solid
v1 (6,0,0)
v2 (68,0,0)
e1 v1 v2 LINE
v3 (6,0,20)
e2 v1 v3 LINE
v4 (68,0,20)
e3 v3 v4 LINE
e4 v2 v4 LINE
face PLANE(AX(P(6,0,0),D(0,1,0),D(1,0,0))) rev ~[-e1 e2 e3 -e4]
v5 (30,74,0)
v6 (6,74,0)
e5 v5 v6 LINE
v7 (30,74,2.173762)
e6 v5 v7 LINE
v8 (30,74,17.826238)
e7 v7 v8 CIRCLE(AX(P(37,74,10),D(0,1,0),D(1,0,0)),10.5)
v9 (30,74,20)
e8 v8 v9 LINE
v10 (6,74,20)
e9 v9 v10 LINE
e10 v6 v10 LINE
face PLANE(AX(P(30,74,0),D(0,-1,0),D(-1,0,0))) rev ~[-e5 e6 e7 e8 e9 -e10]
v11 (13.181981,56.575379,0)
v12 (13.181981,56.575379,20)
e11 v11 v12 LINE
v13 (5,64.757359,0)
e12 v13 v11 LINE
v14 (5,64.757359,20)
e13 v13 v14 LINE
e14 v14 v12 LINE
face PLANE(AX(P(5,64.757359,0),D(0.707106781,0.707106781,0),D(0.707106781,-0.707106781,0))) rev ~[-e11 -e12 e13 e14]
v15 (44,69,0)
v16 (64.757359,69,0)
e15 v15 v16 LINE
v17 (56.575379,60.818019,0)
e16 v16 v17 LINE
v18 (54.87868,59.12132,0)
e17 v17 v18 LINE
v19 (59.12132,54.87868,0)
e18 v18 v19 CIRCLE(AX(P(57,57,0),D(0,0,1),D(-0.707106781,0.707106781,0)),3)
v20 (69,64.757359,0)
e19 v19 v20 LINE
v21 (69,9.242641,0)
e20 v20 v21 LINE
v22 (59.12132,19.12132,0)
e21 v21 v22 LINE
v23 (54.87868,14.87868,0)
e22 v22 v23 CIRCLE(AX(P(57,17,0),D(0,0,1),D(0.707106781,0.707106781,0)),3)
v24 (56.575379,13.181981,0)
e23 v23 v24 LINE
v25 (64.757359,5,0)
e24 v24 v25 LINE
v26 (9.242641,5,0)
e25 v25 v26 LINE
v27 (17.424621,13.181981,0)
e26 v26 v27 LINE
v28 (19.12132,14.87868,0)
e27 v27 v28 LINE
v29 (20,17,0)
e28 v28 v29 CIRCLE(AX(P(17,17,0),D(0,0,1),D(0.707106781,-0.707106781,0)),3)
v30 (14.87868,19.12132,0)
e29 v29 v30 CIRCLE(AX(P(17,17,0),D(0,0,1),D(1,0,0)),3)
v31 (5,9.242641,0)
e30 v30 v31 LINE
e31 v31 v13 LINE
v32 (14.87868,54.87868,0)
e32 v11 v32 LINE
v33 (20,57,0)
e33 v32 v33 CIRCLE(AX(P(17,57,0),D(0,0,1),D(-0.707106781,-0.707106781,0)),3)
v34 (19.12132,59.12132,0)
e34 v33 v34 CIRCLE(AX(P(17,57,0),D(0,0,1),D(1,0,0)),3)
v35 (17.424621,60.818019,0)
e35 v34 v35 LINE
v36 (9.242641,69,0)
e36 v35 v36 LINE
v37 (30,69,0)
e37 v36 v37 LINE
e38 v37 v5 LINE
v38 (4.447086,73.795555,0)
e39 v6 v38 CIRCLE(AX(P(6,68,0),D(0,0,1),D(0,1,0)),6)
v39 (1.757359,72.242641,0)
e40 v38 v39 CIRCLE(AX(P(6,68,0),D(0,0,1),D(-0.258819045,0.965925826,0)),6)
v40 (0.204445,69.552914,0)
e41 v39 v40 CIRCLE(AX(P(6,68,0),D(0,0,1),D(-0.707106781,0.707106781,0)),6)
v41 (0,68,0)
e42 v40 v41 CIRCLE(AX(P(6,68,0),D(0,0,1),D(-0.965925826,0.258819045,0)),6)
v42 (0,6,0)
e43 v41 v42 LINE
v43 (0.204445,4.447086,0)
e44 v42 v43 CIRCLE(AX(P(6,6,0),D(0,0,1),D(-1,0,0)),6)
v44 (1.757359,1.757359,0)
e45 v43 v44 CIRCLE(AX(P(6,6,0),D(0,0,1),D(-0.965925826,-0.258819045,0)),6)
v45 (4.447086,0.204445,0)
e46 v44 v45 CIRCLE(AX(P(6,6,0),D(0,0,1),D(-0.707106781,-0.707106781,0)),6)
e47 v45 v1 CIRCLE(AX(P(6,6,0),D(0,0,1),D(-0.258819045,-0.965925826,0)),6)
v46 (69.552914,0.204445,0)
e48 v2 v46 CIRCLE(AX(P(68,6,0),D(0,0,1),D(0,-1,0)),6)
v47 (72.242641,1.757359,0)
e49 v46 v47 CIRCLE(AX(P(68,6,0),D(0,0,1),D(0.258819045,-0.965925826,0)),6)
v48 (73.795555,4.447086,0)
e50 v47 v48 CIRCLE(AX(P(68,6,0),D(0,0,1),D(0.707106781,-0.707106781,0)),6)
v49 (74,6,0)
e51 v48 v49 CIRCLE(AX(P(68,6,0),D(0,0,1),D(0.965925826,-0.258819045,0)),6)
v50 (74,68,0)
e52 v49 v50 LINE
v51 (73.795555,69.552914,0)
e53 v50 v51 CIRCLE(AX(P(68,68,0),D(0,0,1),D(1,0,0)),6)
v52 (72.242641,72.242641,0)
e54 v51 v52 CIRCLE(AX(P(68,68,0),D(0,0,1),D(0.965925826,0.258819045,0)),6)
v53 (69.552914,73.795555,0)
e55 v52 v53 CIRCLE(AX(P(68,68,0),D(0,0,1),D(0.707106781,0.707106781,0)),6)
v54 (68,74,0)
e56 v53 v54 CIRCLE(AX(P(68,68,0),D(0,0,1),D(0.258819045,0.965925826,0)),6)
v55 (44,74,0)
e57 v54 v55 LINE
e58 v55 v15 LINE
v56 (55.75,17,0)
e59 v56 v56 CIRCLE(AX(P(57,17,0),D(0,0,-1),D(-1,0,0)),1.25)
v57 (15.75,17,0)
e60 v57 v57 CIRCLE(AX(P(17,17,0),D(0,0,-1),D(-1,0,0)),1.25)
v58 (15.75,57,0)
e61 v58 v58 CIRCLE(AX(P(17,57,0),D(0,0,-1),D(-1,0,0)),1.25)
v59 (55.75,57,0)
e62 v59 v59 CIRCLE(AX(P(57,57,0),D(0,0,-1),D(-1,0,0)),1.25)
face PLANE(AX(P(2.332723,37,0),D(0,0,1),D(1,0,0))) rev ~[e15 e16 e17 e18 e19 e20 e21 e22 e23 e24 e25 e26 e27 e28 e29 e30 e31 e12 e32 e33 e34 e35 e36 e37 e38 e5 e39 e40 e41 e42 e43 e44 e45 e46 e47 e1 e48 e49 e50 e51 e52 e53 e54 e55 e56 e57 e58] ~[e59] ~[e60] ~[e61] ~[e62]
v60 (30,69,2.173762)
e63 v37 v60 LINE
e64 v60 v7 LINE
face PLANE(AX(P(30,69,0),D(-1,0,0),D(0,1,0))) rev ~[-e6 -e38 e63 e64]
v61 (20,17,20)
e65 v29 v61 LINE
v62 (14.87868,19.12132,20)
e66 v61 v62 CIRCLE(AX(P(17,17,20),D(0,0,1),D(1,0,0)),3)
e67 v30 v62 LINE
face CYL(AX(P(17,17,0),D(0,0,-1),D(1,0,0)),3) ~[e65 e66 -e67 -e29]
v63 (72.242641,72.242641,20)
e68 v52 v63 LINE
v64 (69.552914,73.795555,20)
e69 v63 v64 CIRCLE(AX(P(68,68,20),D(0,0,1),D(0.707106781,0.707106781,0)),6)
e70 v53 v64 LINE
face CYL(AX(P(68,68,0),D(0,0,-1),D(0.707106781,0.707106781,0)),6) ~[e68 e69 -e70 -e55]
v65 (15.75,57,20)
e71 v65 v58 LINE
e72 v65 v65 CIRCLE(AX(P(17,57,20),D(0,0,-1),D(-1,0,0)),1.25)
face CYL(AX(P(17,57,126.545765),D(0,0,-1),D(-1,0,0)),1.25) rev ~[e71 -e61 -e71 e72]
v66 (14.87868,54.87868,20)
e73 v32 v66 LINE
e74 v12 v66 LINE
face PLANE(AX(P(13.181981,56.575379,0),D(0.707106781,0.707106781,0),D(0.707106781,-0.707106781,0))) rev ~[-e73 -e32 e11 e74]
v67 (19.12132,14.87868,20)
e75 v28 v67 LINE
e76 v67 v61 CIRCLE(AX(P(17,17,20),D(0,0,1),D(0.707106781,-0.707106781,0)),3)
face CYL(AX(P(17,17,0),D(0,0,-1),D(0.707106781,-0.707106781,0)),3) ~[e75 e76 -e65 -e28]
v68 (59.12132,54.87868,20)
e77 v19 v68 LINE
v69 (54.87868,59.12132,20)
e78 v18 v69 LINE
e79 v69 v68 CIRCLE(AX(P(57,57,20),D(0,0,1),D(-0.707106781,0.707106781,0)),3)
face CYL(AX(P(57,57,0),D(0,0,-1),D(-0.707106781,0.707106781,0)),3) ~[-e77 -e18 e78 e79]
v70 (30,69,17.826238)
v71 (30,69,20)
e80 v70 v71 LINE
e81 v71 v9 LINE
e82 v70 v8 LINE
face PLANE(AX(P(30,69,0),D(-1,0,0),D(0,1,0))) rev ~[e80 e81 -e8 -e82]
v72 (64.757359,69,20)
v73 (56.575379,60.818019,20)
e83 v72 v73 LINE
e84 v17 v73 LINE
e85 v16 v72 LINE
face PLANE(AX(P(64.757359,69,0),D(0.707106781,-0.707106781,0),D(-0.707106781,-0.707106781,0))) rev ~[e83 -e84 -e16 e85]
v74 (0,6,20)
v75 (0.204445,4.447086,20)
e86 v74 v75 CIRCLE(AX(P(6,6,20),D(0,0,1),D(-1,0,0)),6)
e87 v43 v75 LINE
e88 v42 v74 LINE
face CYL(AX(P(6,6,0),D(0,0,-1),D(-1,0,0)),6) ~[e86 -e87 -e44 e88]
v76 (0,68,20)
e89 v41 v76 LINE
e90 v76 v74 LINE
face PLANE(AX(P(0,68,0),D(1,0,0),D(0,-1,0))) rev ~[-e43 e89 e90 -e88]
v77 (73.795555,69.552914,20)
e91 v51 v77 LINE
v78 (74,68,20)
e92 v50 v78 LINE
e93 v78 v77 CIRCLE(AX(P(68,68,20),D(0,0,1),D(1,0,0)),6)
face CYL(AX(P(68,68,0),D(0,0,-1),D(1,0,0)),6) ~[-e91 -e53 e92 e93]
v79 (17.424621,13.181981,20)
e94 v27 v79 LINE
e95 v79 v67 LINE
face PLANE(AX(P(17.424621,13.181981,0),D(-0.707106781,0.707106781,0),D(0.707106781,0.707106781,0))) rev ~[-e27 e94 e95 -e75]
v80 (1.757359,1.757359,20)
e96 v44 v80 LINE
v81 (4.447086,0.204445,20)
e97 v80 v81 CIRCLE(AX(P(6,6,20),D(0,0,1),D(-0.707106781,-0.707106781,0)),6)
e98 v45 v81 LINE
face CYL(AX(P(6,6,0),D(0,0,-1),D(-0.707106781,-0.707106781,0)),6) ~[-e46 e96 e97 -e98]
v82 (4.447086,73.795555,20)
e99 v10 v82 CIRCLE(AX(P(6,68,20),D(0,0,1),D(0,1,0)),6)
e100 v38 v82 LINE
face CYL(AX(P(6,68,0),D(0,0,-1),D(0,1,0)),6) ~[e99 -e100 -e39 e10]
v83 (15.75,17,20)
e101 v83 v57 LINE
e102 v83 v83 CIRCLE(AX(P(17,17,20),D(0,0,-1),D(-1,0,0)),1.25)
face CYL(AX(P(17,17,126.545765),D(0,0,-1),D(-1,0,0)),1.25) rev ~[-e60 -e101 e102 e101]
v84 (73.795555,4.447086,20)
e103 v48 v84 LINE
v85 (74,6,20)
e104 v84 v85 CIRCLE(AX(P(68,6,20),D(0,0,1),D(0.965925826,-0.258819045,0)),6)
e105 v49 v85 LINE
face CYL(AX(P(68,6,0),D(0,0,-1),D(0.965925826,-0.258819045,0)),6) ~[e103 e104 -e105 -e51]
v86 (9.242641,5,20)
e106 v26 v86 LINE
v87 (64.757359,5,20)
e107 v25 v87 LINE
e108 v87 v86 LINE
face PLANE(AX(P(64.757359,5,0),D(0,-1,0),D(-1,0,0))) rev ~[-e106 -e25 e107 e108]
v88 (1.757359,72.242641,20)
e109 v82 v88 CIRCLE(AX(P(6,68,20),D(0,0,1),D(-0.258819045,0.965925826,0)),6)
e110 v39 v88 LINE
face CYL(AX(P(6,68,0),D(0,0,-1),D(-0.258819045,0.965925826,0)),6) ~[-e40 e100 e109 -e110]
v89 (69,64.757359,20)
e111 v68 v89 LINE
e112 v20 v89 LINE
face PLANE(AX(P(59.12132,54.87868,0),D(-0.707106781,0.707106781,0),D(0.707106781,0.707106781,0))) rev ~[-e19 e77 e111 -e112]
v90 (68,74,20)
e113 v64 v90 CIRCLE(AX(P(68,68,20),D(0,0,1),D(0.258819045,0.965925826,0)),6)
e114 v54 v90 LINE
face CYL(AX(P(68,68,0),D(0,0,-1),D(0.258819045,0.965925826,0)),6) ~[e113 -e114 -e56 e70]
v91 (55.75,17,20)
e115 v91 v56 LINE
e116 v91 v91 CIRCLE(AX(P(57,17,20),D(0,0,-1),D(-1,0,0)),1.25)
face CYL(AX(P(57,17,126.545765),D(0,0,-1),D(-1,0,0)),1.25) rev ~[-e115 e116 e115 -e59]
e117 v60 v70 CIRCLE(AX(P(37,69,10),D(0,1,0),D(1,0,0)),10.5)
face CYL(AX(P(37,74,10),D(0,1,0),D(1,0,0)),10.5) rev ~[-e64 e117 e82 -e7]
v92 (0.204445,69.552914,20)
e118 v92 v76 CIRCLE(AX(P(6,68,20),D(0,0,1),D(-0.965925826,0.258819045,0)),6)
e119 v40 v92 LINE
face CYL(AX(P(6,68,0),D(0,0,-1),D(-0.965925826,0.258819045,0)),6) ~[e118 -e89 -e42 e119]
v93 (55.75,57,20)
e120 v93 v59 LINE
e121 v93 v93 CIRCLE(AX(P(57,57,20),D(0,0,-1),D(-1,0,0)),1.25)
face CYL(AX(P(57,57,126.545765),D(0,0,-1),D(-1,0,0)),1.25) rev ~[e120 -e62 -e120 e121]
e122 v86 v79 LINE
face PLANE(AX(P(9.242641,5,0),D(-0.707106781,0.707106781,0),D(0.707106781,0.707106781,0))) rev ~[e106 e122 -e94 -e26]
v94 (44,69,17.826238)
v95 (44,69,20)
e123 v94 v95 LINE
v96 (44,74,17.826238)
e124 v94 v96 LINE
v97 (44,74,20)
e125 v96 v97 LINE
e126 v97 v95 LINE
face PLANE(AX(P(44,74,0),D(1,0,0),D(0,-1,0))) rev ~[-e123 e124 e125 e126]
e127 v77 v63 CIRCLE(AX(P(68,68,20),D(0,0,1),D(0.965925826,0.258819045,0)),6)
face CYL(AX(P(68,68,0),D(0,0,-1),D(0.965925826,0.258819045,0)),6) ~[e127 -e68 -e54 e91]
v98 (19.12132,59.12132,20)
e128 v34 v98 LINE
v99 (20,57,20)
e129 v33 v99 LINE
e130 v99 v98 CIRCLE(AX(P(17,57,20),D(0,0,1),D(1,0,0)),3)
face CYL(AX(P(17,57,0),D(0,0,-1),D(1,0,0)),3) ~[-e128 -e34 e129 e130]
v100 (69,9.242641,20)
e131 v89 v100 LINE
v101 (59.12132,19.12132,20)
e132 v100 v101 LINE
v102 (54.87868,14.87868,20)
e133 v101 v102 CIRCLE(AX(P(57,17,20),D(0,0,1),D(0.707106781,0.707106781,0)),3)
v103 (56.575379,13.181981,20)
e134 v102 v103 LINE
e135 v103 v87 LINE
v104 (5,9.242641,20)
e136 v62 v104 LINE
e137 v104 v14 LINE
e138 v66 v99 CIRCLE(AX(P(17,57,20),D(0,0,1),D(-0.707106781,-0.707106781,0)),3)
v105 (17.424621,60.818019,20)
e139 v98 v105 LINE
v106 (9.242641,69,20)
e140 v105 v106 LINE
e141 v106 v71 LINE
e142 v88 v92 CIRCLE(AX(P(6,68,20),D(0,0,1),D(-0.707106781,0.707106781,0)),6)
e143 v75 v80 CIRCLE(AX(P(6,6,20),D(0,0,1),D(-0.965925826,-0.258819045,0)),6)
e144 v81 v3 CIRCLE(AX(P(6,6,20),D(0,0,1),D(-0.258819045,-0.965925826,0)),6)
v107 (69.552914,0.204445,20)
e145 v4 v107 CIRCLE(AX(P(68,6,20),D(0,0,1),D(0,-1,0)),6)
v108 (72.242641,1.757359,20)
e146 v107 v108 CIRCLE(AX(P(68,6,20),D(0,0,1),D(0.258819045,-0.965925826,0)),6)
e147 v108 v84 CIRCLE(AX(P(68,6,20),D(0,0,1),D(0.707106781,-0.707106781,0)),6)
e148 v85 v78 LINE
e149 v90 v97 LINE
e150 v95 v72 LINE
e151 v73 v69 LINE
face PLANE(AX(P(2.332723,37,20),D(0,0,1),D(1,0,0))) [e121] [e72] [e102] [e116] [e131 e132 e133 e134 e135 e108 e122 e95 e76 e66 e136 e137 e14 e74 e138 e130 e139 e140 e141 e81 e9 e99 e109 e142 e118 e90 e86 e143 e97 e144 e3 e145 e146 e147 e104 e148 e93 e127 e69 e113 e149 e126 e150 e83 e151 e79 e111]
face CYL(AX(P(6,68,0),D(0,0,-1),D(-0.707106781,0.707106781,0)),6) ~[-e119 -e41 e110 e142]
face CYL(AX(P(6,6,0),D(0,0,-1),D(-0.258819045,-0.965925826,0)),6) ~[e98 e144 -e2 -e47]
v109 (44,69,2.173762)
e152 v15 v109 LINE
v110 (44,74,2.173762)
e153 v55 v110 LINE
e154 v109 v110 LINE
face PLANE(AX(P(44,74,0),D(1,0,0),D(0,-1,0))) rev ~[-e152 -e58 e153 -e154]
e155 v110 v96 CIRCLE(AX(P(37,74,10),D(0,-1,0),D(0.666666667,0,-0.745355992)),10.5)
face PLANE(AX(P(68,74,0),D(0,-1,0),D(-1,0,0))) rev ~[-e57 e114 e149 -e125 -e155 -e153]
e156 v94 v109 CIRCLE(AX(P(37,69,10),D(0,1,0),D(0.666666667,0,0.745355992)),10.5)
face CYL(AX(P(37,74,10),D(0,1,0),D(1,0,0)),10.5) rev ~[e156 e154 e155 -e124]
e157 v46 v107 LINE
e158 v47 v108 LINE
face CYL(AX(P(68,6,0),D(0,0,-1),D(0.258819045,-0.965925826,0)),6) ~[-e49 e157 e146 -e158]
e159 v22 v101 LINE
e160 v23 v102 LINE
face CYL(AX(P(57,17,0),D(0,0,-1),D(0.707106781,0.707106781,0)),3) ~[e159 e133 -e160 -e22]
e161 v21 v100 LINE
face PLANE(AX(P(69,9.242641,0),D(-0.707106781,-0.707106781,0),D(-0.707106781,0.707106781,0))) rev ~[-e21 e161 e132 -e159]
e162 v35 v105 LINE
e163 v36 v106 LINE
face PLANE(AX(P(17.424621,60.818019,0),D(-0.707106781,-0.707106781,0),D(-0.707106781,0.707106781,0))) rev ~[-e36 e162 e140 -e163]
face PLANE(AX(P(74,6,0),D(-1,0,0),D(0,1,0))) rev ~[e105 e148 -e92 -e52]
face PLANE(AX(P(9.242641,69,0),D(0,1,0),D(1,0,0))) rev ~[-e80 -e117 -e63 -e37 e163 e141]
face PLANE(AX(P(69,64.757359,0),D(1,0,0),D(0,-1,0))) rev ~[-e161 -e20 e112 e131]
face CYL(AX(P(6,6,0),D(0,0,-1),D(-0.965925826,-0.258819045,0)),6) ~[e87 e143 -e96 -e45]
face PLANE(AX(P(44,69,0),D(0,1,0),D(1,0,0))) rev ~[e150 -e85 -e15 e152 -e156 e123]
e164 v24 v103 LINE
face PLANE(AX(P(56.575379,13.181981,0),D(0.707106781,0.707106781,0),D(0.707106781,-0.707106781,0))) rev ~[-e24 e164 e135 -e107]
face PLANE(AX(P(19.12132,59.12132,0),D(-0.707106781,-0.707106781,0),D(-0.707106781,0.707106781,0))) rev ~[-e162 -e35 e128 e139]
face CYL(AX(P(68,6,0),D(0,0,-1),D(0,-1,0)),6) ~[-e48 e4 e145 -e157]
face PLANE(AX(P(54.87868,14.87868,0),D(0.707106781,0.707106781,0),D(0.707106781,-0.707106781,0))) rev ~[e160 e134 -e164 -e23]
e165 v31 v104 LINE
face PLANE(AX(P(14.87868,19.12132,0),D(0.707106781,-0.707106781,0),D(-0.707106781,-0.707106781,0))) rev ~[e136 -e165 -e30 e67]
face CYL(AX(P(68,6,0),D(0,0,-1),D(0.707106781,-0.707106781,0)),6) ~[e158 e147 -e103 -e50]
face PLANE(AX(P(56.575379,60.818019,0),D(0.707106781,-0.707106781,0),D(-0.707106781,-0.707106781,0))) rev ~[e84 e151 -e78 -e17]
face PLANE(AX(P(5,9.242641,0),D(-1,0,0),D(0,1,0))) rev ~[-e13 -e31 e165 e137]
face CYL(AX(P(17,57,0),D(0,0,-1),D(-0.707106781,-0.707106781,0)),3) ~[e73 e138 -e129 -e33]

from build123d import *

# Parameters (mm, degrees)
F1_DEPTH = 20
F3_DEPTH = 25
F6_D     = 2.5


# Not quite as in the source:
# - a feature names something its author has since deleted; it is built from what else it names


with BuildPart() as f1:
    # F0 (on Top) → F1 (new body)
    with BuildSketch(Plane.XY):
        with BuildLine():
            Line((0, 68), (0, 6))
            ThreePointArc((0, 6), (0.0513308318, 5.2168428467), (0.2044450423, 4.4470857294))
            Line((0.2044450423, 4.4470857294), (5, 9.2426406871))
            Line((5, 9.2426406871), (5, 24.5))
            Line((5, 24.5), (5, 49))
            Line((5, 49), (5, 64.7573593129))
            Line((5, 64.7573593129), (0.2044450423, 69.5529142706))
            ThreePointArc((0.2044450423, 69.5529142706), (0.0513308318, 68.7831571533), (0, 68))
        make_face()
        with BuildLine():
            Line((5, 9.2426406871), (0.2044450423, 4.4470857294))
            ThreePointArc((0.2044450423, 4.4470857294), (0.8038475773, 3), (1.7573593129, 1.7573593129))
            Line((1.7573593129, 1.7573593129), (5.2928932188, 5.2928932188))
            ThreePointArc((5.2928932188, 5.2928932188), (5.0761204675, 5.6173165676), (5, 6))
            Line((5, 6), (5, 9.2426406871))
        make_face()
        with BuildLine():
            ThreePointArc((1.7573593129, 72.2426406871), (0.8038475773, 71), (0.2044450423, 69.5529142706))
            Line((0.2044450423, 69.5529142706), (5, 64.7573593129))
            Line((5, 64.7573593129), (5, 68))
            ThreePointArc((5, 68), (5.0761204675, 68.3826834324), (5.2928932188, 68.7071067812))
            Line((5.2928932188, 68.7071067812), (1.7573593129, 72.2426406871))
        make_face()
        with BuildLine():
            Line((5.2928932188, 5.2928932188), (1.7573593129, 1.7573593129))
            ThreePointArc((1.7573593129, 1.7573593129), (3, 0.8038475773), (4.4470857294, 0.2044450423))
            Line((4.4470857294, 0.2044450423), (9.2426406871, 5))
            Line((9.2426406871, 5), (6, 5))
            ThreePointArc((6, 5), (5.6173165676, 5.0761204675), (5.2928932188, 5.2928932188))
        make_face()
        with BuildLine():
            Line((14.8786796564, 19.1213203436), (5, 9.2426406871))
            Line((5, 9.2426406871), (5, 6))
            ThreePointArc((5, 6), (5.0761204675, 5.6173165676), (5.2928932188, 5.2928932188))
            Line((5.2928932188, 5.2928932188), (14.8786796564, 14.8786796564))
            ThreePointArc((14.8786796564, 14.8786796564), (14, 17), (14.8786796564, 19.1213203436))
        make_face()
        with BuildLine():
            ThreePointArc((4.4470857294, 73.7955549577), (3, 73.1961524227), (1.7573593129, 72.2426406871))
            Line((1.7573593129, 72.2426406871), (5.2928932188, 68.7071067812))
            ThreePointArc((5.2928932188, 68.7071067812), (5.6173165676, 68.9238795325), (6, 69))
            Line((6, 69), (9.2426406871, 69))
            Line((9.2426406871, 69), (4.4470857294, 73.7955549577))
        make_face()
        with BuildLine():
            Line((5, 68), (5, 64.7573593129))
            Line((5, 64.7573593129), (13.1819805153, 56.5753787975))
            Line((13.1819805153, 56.5753787975), (14.8786796564, 54.8786796564))
            ThreePointArc((14.8786796564, 54.8786796564), (14, 57), (14.8786796564, 59.1213203436))
            Line((14.8786796564, 59.1213203436), (5.2928932188, 68.7071067812))
            ThreePointArc((5.2928932188, 68.7071067812), (5.0761204675, 68.3826834324), (5, 68))
        make_face()
        with BuildLine():
            Line((9.2426406871, 5), (4.4470857294, 0.2044450423))
            ThreePointArc((4.4470857294, 0.2044450423), (5.2168428467, 0.0513308318), (6, 0))
            Line((6, 0), (37, 0))
            Line((37, 0), (68, 0))
            ThreePointArc((68, 0), (68.7831571533, 0.0513308318), (69.5529142706, 0.2044450423))
            Line((69.5529142706, 0.2044450423), (64.7573593129, 5))
            Line((64.7573593129, 5), (37, 5))
            Line((37, 5), (30, 5))
            Line((30, 5), (9.2426406871, 5))
        make_face()
        with BuildLine():
            Line((14.8786796564, 14.8786796564), (5.2928932188, 5.2928932188))
            ThreePointArc((5.2928932188, 5.2928932188), (5.6173165676, 5.0761204675), (6, 5))
            Line((6, 5), (9.2426406871, 5))
            Line((9.2426406871, 5), (17.4246212025, 13.1819805153))
            Line((17.4246212025, 13.1819805153), (19.1213203436, 14.8786796564))
            ThreePointArc((19.1213203436, 14.8786796564), (17, 14), (14.8786796564, 14.8786796564))
        make_face()
        with BuildLine():
            ThreePointArc((20, 17), (18.1480502971, 19.7716385975), (14.8786796564, 19.1213203436))
            ThreePointArc((14.8786796564, 19.1213203436), (14, 17), (14.8786796564, 14.8786796564))
            ThreePointArc((14.8786796564, 14.8786796564), (17, 14), (19.1213203436, 14.8786796564))
            ThreePointArc((19.1213203436, 14.8786796564), (19.7716385975, 15.8519497029), (20, 17))
        make_face()
        with BuildLine():
            ThreePointArc((6, 74), (5.2168428467, 73.9486691682), (4.4470857294, 73.7955549577))
            Line((4.4470857294, 73.7955549577), (9.2426406871, 69))
            Line((9.2426406871, 69), (30, 69))
            Line((30, 69), (30, 74))
            Line((30, 74), (6, 74))
        make_face()
        with BuildLine():
            ThreePointArc((6, 69), (5.6173165676, 68.9238795325), (5.2928932188, 68.7071067812))
            Line((5.2928932188, 68.7071067812), (14.8786796564, 59.1213203436))
            ThreePointArc((14.8786796564, 59.1213203436), (17, 60), (19.1213203436, 59.1213203436))
            Line((19.1213203436, 59.1213203436), (17.4246212025, 60.8180194847))
            Line((17.4246212025, 60.8180194847), (9.2426406871, 69))
            Line((9.2426406871, 69), (6, 69))
        make_face()
        with BuildLine():
            ThreePointArc((19.1213203436, 59.1213203436), (17, 60), (14.8786796564, 59.1213203436))
            ThreePointArc((14.8786796564, 59.1213203436), (14, 57), (14.8786796564, 54.8786796564))
            ThreePointArc((14.8786796564, 54.8786796564), (18.1480502971, 54.2283614025), (20, 57))
            ThreePointArc((20, 57), (19.7716385975, 58.1480502971), (19.1213203436, 59.1213203436))
        make_face()
        with BuildLine():
            Line((64.7573593129, 5), (69.5529142706, 0.2044450423))
            ThreePointArc((69.5529142706, 0.2044450423), (71, 0.8038475773), (72.2426406871, 1.7573593129))
            Line((72.2426406871, 1.7573593129), (68.7071067812, 5.2928932188))
            ThreePointArc((68.7071067812, 5.2928932188), (68.3826834324, 5.0761204675), (68, 5))
            Line((68, 5), (64.7573593129, 5))
        make_face()
        with BuildLine():
            Line((56.5753787975, 13.1819805153), (64.7573593129, 5))
            Line((64.7573593129, 5), (68, 5))
            ThreePointArc((68, 5), (68.3826834324, 5.0761204675), (68.7071067812, 5.2928932188))
            Line((68.7071067812, 5.2928932188), (59.1213203436, 14.8786796564))
            ThreePointArc((59.1213203436, 14.8786796564), (57, 14), (54.8786796564, 14.8786796564))
            Line((54.8786796564, 14.8786796564), (56.5753787975, 13.1819805153))
        make_face()
        with BuildLine():
            Line((68.7071067812, 5.2928932188), (72.2426406871, 1.7573593129))
            ThreePointArc((72.2426406871, 1.7573593129), (73.1961524227, 3), (73.7955549577, 4.4470857294))
            Line((73.7955549577, 4.4470857294), (69, 9.2426406871))
            Line((69, 9.2426406871), (69, 6))
            ThreePointArc((69, 6), (68.9238795325, 5.6173165676), (68.7071067812, 5.2928932188))
        make_face()
        with BuildLine():
            Line((69, 9.2426406871), (73.7955549577, 4.4470857294))
            ThreePointArc((73.7955549577, 4.4470857294), (73.9486691682, 5.2168428467), (74, 6))
            Line((74, 6), (74, 68))
            ThreePointArc((74, 68), (73.9486691682, 68.7831571533), (73.7955549577, 69.5529142706))
            Line((73.7955549577, 69.5529142706), (69, 64.7573593129))
            Line((69, 64.7573593129), (69, 49))
            Line((69, 49), (69, 24.5))
            Line((69, 24.5), (69, 9.2426406871))
        make_face()
        with BuildLine():
            Line((59.1213203436, 14.8786796564), (68.7071067812, 5.2928932188))
            ThreePointArc((68.7071067812, 5.2928932188), (68.9238795325, 5.6173165676), (69, 6))
            Line((69, 6), (69, 9.2426406871))
            Line((69, 9.2426406871), (59.1213203436, 19.1213203436))
            ThreePointArc((59.1213203436, 19.1213203436), (59.7716385975, 18.1480502971), (60, 17))
            ThreePointArc((60, 17), (59.7716385975, 15.8519497029), (59.1213203436, 14.8786796564))
        make_face()
        with BuildLine():
            ThreePointArc((59.1213203436, 19.1213203436), (54.8786796564, 19.1213203436), (54.8786796564, 14.8786796564))
            ThreePointArc((54.8786796564, 14.8786796564), (57, 14), (59.1213203436, 14.8786796564))
            ThreePointArc((59.1213203436, 14.8786796564), (59.7716385975, 15.8519497029), (60, 17))
            ThreePointArc((60, 17), (59.7716385975, 18.1480502971), (59.1213203436, 19.1213203436))
        make_face()
        with BuildLine():
            Line((69, 64.7573593129), (73.7955549577, 69.5529142706))
            ThreePointArc((73.7955549577, 69.5529142706), (73.1961524227, 71), (72.2426406871, 72.2426406871))
            Line((72.2426406871, 72.2426406871), (68.7071067812, 68.7071067812))
            ThreePointArc((68.7071067812, 68.7071067812), (68.9238795325, 68.3826834324), (69, 68))
            Line((69, 68), (69, 64.7573593129))
        make_face()
        with BuildLine():
            Line((68.7071067812, 68.7071067812), (72.2426406871, 72.2426406871))
            ThreePointArc((72.2426406871, 72.2426406871), (71, 73.1961524227), (69.5529142706, 73.7955549577))
            Line((69.5529142706, 73.7955549577), (64.7573593129, 69))
            Line((64.7573593129, 69), (68, 69))
            ThreePointArc((68, 69), (68.3826834324, 68.9238795325), (68.7071067812, 68.7071067812))
        make_face()
        with BuildLine():
            Line((59.1213203436, 54.8786796564), (69, 64.7573593129))
            Line((69, 64.7573593129), (69, 68))
            ThreePointArc((69, 68), (68.9238795325, 68.3826834324), (68.7071067812, 68.7071067812))
            Line((68.7071067812, 68.7071067812), (59.1213203436, 59.1213203436))
            ThreePointArc((59.1213203436, 59.1213203436), (59.7716385975, 58.1480502971), (60, 57))
            ThreePointArc((60, 57), (59.7716385975, 55.8519497029), (59.1213203436, 54.8786796564))
        make_face()
        with BuildLine():
            Line((64.7573593129, 69), (69.5529142706, 73.7955549577))
            ThreePointArc((69.5529142706, 73.7955549577), (68.7831571533, 73.9486691682), (68, 74))
            Line((68, 74), (44, 74))
            Line((44, 74), (44, 69))
            Line((44, 69), (64.7573593129, 69))
        make_face()
        with BuildLine():
            Line((59.1213203436, 59.1213203436), (68.7071067812, 68.7071067812))
            ThreePointArc((68.7071067812, 68.7071067812), (68.3826834324, 68.9238795325), (68, 69))
            Line((68, 69), (64.7573593129, 69))
            Line((64.7573593129, 69), (56.5753787975, 60.8180194847))
            Line((56.5753787975, 60.8180194847), (54.8786796564, 59.1213203436))
            ThreePointArc((54.8786796564, 59.1213203436), (57, 60), (59.1213203436, 59.1213203436))
        make_face()
        with BuildLine():
            ThreePointArc((54.8786796564, 59.1213203436), (54.8786796564, 54.8786796564), (59.1213203436, 54.8786796564))
            ThreePointArc((59.1213203436, 54.8786796564), (59.7716385975, 55.8519497029), (60, 57))
            ThreePointArc((60, 57), (59.7716385975, 58.1480502971), (59.1213203436, 59.1213203436))
            ThreePointArc((59.1213203436, 59.1213203436), (57, 60), (54.8786796564, 59.1213203436))
        make_face()
    extrude(amount=F1_DEPTH)


with BuildPart() as f3:
    # F2 (on face) → F3 (new body)
    with BuildSketch(Plane(origin=(0, 74, 0), x_dir=(-1, 0, 0), z_dir=(0, 1, 0))):
        with BuildLine():
            ThreePointArc((-26.5, 10), (-37, 20.5), (-47.5, 10))
            Line((-47.5, 10), (-26.5, 10))
        make_face()
        with BuildLine():
            Line((-26.5, 10), (-47.5, 10))
            ThreePointArc((-47.5, 10), (-37, -0.5), (-26.5, 10))
        make_face()
    extrude(amount=-F3_DEPTH)


with BuildPart() as f1_1:
    add(f1.part)

    # F4: cut F3
    add(f3.part, mode=Mode.SUBTRACT)

    # F6 (through all)
    with Locations(Plane.XY.offset(20)):
        with Locations((17, 57), (57, 57), (57, 17), (17, 17)):
            Hole(F6_D / 2)


solid = f1_1.part
